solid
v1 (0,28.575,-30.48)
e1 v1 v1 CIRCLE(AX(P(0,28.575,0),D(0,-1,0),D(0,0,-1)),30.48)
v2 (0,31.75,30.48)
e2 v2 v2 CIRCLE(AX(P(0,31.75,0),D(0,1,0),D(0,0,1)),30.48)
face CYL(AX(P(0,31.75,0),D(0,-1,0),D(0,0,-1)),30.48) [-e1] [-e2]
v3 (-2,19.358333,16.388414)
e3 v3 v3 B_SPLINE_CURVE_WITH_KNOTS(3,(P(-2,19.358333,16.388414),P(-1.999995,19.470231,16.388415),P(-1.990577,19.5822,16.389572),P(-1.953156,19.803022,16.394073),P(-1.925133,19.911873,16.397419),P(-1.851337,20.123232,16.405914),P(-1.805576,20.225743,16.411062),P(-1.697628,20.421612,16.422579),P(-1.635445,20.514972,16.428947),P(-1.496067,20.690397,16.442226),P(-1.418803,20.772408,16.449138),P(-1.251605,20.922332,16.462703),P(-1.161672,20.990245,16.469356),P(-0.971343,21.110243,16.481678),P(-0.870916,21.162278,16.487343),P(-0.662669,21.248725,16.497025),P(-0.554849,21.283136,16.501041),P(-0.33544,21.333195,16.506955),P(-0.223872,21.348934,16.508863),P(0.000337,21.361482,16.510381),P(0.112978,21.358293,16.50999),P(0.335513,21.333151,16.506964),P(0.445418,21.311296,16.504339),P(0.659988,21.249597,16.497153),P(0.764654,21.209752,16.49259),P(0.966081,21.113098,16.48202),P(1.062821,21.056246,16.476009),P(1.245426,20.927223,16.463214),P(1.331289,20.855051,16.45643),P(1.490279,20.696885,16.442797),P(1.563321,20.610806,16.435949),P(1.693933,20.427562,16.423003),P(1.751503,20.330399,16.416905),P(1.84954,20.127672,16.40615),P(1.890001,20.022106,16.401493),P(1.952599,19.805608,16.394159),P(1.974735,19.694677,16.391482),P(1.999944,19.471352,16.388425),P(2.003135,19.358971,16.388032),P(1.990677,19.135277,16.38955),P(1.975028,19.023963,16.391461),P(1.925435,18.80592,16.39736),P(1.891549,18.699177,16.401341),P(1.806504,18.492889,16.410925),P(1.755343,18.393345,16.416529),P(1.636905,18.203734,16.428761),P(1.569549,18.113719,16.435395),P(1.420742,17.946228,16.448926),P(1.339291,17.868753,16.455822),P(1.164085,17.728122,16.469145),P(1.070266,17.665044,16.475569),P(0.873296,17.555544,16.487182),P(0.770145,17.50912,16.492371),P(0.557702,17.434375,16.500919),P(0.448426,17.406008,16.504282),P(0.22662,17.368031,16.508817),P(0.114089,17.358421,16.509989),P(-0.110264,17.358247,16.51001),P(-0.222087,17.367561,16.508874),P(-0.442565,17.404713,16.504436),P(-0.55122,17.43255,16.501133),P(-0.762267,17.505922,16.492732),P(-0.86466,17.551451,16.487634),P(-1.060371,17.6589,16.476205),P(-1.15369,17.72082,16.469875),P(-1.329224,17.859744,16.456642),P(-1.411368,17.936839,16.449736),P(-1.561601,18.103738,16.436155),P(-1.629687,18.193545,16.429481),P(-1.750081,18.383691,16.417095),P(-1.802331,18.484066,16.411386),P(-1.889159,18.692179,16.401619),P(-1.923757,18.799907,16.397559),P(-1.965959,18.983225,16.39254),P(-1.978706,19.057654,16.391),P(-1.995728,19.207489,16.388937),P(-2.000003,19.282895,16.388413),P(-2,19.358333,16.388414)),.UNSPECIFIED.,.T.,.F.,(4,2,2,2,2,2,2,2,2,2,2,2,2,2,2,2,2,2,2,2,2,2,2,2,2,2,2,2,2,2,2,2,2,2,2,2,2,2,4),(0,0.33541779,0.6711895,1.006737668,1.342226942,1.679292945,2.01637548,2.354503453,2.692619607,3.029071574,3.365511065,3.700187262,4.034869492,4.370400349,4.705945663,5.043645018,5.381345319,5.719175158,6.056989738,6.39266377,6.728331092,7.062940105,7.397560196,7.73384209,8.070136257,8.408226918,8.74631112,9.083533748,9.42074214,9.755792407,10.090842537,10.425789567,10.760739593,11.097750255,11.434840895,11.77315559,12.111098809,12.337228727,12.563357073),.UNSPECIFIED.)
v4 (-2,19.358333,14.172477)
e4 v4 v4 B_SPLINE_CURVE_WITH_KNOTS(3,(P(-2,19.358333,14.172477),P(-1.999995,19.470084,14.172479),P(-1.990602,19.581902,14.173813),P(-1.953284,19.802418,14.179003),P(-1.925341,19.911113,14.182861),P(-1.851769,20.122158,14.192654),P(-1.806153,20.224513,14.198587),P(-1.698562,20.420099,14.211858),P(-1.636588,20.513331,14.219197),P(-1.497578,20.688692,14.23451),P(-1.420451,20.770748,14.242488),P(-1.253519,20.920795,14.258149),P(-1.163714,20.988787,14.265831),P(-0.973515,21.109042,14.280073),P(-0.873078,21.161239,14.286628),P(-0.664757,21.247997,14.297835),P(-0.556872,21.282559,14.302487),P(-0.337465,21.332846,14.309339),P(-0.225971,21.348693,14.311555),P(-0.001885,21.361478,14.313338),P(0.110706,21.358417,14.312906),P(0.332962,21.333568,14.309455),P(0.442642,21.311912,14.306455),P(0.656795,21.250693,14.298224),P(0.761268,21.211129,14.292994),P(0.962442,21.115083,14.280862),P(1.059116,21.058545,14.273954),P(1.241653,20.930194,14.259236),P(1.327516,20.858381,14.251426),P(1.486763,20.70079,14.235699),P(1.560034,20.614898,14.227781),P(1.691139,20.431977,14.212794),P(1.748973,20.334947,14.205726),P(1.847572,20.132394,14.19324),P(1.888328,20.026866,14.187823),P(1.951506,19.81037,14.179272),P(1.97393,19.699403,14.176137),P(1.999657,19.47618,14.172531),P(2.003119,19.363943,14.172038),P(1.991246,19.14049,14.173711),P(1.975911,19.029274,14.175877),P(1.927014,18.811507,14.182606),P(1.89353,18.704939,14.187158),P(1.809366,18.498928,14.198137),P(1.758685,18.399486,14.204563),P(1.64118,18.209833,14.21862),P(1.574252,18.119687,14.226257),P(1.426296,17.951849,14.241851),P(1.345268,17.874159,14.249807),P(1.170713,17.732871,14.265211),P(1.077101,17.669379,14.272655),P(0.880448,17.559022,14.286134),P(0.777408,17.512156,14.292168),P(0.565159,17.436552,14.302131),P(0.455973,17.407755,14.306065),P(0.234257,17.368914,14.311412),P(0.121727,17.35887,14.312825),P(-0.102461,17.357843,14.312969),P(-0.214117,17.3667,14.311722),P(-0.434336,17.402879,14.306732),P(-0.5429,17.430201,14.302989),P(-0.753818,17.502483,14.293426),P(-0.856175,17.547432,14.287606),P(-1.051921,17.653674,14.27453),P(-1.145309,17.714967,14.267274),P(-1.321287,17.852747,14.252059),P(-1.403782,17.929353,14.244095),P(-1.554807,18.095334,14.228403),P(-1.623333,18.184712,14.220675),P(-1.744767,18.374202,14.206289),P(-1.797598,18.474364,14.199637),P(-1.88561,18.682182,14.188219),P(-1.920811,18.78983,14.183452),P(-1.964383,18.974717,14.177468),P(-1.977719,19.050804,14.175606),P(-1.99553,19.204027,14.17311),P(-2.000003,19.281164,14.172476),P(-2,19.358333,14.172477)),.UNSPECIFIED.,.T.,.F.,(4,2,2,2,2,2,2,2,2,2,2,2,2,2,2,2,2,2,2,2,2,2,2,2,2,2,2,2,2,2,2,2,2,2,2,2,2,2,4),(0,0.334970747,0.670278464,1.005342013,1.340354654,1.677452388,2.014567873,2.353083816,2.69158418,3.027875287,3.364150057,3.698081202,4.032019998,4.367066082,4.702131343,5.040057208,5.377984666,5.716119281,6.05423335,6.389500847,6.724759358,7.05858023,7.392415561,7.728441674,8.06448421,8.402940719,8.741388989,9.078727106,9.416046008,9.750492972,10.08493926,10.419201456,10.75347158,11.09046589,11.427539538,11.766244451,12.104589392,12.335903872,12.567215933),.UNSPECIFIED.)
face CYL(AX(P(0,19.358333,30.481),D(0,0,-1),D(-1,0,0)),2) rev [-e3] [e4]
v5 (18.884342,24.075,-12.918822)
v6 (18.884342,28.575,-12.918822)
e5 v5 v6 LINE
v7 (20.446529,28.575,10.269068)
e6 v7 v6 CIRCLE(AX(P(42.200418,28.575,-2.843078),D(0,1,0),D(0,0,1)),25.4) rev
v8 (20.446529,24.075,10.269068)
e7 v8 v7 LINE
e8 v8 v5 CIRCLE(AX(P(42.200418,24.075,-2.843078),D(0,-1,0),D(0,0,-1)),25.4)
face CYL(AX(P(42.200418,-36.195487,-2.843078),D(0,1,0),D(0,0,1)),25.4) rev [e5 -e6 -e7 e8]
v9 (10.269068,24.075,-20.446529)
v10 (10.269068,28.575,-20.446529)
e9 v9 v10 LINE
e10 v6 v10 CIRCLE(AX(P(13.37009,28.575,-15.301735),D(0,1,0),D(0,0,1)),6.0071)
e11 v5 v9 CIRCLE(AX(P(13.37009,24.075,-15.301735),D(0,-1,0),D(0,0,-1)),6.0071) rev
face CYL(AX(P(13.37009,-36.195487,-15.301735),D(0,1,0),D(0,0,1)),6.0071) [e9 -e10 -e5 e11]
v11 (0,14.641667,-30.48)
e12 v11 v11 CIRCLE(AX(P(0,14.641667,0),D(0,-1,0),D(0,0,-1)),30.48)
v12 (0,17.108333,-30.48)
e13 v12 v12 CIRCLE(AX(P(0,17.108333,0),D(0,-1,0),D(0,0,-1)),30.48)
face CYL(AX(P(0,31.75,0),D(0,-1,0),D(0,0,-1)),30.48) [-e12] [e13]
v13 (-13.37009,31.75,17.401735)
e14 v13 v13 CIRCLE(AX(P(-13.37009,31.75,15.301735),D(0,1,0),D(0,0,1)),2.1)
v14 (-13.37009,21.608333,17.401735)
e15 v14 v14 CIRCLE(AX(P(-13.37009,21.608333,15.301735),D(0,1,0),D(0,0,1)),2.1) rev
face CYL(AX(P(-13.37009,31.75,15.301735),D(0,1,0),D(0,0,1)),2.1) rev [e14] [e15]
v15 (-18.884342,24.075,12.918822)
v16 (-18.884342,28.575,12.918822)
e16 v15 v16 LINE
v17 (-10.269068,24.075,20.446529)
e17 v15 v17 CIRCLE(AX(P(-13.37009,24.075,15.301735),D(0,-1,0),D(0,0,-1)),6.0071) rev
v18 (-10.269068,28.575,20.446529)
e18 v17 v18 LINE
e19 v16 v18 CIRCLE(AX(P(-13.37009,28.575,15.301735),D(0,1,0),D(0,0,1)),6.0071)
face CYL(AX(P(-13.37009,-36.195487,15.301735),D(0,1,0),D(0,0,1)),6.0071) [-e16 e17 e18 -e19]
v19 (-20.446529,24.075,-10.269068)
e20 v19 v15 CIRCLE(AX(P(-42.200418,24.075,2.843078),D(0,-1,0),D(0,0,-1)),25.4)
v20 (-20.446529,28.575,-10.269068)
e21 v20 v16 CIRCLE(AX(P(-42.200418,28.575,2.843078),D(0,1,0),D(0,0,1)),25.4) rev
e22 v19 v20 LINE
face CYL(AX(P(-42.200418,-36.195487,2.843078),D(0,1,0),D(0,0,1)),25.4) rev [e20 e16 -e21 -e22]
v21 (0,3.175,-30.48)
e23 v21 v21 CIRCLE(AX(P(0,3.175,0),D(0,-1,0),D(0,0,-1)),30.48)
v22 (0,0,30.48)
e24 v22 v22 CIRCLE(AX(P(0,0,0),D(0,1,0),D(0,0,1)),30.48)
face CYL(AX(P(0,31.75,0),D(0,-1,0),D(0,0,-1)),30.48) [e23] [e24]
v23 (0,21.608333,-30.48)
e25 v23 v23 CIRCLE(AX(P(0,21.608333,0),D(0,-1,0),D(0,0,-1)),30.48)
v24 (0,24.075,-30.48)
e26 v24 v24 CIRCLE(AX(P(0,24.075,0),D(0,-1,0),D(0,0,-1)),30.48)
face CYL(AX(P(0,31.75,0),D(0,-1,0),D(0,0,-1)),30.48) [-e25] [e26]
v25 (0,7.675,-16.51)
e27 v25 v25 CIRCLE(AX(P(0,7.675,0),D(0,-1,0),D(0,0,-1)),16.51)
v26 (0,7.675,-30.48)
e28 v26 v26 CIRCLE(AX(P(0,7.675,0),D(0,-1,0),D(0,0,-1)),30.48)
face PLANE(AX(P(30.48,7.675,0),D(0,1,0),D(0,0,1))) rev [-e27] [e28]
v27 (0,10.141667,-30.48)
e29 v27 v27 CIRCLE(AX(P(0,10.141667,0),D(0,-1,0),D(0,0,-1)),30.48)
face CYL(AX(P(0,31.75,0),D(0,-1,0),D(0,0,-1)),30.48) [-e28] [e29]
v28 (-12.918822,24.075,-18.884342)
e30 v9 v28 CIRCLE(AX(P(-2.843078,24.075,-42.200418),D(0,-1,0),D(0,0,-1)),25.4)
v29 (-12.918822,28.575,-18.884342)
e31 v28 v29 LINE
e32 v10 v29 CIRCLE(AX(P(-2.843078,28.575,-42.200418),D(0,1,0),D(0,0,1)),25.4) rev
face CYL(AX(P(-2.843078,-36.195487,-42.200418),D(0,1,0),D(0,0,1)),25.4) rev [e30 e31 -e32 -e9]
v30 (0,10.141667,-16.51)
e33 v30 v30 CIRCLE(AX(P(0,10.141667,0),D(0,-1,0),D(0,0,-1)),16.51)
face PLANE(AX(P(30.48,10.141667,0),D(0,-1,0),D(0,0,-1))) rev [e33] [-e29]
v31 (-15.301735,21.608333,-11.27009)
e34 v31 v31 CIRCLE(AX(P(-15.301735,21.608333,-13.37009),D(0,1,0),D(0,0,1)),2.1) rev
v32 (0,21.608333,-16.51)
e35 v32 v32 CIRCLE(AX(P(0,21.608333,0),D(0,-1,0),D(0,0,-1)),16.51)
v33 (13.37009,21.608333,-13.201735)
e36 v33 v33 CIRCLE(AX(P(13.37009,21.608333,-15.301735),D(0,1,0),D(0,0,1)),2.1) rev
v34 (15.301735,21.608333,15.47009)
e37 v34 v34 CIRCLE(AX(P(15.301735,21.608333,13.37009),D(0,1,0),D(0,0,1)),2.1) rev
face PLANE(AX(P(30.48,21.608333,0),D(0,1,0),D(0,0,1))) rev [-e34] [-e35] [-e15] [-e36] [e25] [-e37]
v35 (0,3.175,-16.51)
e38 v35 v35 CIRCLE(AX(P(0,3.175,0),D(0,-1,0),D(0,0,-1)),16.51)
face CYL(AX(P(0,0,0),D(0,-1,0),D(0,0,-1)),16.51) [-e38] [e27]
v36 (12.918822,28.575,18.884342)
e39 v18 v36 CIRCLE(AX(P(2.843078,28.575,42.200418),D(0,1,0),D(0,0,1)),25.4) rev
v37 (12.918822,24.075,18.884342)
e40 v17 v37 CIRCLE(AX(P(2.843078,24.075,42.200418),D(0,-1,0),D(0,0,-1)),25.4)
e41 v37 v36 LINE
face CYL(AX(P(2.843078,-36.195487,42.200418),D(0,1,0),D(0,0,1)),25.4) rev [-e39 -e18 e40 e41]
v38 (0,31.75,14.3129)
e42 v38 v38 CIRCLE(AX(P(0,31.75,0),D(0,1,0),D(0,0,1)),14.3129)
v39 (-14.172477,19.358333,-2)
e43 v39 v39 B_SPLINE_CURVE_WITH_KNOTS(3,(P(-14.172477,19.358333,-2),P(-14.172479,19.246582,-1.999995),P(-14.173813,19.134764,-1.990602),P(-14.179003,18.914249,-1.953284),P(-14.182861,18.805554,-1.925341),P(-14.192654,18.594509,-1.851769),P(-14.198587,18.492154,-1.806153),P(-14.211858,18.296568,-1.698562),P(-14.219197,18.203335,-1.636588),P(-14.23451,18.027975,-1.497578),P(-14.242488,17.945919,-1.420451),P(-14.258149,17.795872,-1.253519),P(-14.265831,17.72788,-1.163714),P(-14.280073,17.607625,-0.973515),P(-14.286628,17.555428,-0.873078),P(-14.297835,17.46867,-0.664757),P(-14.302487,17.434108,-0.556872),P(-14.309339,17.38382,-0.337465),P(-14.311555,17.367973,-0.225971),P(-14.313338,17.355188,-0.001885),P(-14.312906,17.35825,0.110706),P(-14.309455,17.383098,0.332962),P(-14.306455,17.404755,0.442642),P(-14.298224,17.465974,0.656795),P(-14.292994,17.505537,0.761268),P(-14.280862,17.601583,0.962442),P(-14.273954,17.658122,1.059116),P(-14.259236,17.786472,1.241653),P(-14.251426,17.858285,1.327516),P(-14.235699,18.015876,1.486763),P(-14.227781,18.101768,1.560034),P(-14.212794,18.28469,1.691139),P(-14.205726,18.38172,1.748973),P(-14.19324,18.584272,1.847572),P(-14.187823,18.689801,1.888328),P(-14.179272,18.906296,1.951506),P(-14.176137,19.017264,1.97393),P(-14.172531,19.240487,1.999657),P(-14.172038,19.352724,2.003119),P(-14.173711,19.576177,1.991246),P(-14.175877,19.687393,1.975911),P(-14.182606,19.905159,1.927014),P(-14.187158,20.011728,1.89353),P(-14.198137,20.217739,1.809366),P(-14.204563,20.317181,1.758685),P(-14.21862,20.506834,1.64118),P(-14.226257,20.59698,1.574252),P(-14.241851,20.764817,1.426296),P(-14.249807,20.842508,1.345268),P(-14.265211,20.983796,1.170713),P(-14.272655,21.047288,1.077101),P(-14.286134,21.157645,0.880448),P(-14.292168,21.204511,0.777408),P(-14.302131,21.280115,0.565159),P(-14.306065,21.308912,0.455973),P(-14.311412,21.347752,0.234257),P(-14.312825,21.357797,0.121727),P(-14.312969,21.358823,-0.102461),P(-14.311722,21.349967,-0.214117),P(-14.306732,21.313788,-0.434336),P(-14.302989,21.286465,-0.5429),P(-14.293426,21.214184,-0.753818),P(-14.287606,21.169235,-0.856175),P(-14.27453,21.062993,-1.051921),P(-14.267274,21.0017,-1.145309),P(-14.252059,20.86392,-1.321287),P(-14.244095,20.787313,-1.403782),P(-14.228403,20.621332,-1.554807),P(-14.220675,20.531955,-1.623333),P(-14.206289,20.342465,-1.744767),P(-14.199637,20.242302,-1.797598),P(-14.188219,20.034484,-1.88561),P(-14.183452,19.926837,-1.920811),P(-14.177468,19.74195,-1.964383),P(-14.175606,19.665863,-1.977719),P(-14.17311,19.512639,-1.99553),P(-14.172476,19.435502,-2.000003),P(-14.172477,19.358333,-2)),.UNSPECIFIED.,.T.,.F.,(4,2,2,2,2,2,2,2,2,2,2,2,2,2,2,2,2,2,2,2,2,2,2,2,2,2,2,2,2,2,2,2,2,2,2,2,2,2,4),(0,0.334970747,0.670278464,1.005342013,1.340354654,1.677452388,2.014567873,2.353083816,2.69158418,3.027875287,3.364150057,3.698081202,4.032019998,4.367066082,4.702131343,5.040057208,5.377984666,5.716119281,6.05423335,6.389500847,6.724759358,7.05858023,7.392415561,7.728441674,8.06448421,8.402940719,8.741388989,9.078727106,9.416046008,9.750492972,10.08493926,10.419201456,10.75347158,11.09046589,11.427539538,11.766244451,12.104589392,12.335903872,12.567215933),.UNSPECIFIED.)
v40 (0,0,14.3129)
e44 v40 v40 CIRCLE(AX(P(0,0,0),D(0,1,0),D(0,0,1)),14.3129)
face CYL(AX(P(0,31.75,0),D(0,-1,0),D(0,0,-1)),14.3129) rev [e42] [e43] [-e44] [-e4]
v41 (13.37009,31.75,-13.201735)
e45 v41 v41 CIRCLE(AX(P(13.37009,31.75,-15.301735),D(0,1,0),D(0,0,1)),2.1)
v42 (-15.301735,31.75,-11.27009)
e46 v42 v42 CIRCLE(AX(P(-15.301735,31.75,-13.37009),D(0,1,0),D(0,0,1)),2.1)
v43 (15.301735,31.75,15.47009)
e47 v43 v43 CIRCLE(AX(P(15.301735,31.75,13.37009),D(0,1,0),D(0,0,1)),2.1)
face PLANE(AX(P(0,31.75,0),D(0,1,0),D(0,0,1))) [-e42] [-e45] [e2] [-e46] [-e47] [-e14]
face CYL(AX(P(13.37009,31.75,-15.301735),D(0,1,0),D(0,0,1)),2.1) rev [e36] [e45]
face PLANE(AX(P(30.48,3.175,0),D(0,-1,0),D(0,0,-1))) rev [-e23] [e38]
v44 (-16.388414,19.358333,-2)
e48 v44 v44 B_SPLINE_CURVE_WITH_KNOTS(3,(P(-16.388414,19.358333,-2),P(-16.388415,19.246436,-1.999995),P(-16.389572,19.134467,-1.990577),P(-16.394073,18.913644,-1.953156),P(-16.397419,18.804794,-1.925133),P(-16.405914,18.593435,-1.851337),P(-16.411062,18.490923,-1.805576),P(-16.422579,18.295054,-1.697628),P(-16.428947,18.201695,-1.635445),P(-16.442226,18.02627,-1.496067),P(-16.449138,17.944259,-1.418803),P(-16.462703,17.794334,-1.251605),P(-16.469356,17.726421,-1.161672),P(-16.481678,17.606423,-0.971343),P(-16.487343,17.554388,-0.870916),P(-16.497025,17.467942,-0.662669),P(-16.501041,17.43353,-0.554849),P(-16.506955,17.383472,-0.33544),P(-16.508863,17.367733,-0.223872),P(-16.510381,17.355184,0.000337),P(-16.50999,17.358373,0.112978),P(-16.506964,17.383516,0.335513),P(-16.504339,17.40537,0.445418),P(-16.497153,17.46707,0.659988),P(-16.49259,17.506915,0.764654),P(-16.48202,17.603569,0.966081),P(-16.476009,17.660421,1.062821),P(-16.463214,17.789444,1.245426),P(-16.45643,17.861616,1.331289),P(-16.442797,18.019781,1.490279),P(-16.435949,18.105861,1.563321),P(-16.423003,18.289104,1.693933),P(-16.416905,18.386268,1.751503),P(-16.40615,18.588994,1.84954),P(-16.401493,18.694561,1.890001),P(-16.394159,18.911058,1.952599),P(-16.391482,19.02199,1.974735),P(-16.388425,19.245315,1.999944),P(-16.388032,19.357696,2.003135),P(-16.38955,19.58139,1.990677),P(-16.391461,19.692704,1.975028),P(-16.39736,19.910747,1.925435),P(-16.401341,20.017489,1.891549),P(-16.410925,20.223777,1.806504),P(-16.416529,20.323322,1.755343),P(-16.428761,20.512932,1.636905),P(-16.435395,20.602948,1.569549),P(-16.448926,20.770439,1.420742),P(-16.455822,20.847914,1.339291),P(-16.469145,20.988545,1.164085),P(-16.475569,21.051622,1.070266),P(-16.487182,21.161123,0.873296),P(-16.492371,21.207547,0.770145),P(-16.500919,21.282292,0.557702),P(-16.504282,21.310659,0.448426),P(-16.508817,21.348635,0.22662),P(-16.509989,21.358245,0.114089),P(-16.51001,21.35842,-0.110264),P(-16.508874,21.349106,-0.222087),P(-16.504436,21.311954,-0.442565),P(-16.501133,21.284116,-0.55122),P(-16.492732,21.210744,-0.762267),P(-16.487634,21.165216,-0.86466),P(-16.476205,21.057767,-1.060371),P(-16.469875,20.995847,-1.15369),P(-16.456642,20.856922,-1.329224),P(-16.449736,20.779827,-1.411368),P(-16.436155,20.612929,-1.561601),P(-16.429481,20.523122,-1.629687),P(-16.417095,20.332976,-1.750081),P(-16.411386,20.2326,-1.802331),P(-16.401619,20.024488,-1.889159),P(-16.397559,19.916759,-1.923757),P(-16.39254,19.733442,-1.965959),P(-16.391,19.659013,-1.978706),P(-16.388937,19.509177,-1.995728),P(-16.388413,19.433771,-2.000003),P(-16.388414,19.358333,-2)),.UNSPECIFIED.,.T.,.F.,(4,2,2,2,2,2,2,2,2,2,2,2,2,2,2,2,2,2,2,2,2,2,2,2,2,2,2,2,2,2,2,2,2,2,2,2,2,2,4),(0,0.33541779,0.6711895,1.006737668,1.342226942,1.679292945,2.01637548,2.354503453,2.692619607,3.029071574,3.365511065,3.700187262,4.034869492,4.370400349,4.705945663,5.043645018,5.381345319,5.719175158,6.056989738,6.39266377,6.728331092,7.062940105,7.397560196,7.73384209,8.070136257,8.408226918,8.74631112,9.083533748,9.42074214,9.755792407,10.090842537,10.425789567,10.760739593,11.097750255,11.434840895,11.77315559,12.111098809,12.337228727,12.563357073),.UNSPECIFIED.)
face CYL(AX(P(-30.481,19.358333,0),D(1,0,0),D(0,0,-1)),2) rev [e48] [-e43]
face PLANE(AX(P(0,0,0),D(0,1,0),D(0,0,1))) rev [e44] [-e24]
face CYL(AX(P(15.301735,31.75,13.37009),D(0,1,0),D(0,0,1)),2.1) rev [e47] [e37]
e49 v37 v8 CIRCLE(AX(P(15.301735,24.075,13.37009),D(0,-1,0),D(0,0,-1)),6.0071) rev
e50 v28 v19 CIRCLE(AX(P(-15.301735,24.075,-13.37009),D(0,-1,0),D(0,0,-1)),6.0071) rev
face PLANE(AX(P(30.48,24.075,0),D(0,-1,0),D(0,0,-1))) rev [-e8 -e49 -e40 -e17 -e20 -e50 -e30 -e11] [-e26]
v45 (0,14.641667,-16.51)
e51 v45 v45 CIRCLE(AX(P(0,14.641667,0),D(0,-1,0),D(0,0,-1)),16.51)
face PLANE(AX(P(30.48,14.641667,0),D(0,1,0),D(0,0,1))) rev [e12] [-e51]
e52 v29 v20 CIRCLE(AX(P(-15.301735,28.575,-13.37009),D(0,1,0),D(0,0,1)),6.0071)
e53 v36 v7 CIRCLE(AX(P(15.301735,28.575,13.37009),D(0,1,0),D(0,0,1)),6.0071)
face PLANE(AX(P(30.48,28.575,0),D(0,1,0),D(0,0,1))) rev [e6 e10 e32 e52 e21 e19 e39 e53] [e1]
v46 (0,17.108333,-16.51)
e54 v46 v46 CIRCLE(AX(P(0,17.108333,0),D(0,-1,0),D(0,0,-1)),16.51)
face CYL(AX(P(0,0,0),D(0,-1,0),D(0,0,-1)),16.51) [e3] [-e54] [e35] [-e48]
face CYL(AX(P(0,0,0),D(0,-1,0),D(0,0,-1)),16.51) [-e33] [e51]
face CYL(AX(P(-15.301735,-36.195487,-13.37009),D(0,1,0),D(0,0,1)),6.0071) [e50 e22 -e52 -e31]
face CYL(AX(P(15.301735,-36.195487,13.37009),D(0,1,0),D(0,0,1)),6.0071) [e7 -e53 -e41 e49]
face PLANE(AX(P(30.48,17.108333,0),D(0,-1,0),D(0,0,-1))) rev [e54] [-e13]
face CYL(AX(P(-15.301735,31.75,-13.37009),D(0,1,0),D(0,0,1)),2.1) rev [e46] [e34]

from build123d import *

# Parameters (mm, degrees)
SKETCH1_R                        = 30.48
SKETCH1_R_2                      = 14.3129
BOSS_EXTRUDE1_DEPTH              = 31.75
SKETCH2_W                        = 13.97
SKETCH2_H                        = 4.5
BOSS_EXTRUDE2_START              = -7.675
BOSS_EXTRUDE2_OUTLINE_R          = 16.51
BOSS_EXTRUDE2_DEPTH              = 4.5
CUT_EXTRUDE2_REACH               = 55.536
CUT_EXTRUDE2_END_RADIUS          = 16.51
SKETCH8_R                        = 2
CUT_EXTRUDE3_REACH               = 55.536
CUT_EXTRUDE3_END_RADIUS          = 16.51
SKETCH9_R                        = 2
SKETCH10_R                       = 1
CUT_EXTRUDE4_DEPTH               = 10.141666667
TAP_DRILL_FOR_M5X0_8_TAP1_REACH  = 72.9
TAP_DRILL_FOR_M5X0_8_TAP1_BORE_R = 2.1


with BuildPart() as part:
    # Sketch1 → Boss-Extrude1 (new body)
    with BuildSketch(Plane(origin=(0, 0, 0), x_dir=(1, 0, 0), z_dir=(0, 1, 0))):
        with Locations(Location((0, 0, 0), (0, 0, 270))):
            Circle(SKETCH1_R)
        with Locations(Location((0, 0, 0), (0, 0, 270))):
            Circle(SKETCH1_R_2, mode=Mode.SUBTRACT)
    extrude(amount=BOSS_EXTRUDE1_DEPTH)

    # Sketch2 → Cut-Revolve2 (revolve, cut)
    with BuildSketch(Plane.XY, mode=Mode.PRIVATE) as cut_revolve2_sk:
        with Locations((23.495, 26.325)):
            Rectangle(SKETCH2_W, SKETCH2_H)
        with Locations((23.495, 12.391666667)):
            Rectangle(SKETCH2_W, SKETCH2_H)
        with Locations((23.495, 5.425)):
            Rectangle(SKETCH2_W, SKETCH2_H)
        with Locations((23.495, 19.358333333)):
            Rectangle(SKETCH2_W, SKETCH2_H)
    revolve(cut_revolve2_sk.sketch.rotate(Axis((0, 0, 0), (0, 1, 0)), 90), axis=Axis((0, 0, 0), (0, 1, 0)), mode=Mode.SUBTRACT)

    # Boss-Extrude2: read off the stored shape, not the designer's step
    # Boss-Extrude2 outline → Boss-Extrude2 (add)
    with BuildSketch(Plane(origin=(0, 31.75, 0), x_dir=(1, 0, 0), z_dir=(0, 1, 0)).offset(BOSS_EXTRUDE2_START)):
        with BuildLine():
            ThreePointArc((-20.446529483, 10.269067687), (-16.857865235, -1.135728529), (-18.884341927, -12.918821503))
            ThreePointArc((-18.884341927, -12.918821503), (-17.322622903, -19.825310342), (-10.269067687, -20.446529483))
            ThreePointArc((-10.269067687, -20.446529483), (1.135728529, -16.857865235), (12.918821503, -18.884341927))
            ThreePointArc((12.918821503, -18.884341927), (19.825310342, -17.322622903), (20.446529483, -10.269067687))
            ThreePointArc((20.446529483, -10.269067687), (16.857865235, 1.135728529), (18.884341927, 12.918821503))
            ThreePointArc((18.884341927, 12.918821503), (17.322622903, 19.825310342), (10.269067687, 20.446529483))
            ThreePointArc((10.269067687, 20.446529483), (-1.135728529, 16.857865235), (-12.918821503, 18.884341927))
            ThreePointArc((-12.918821503, 18.884341927), (-19.825310342, 17.322622903), (-20.446529483, 10.269067687))
        make_face()
        Circle(BOSS_EXTRUDE2_OUTLINE_R, mode=Mode.SUBTRACT)
    extrude(amount=BOSS_EXTRUDE2_DEPTH)

    # Cut-Extrude2: up to this cylinder (the profile starts inside it)
    cut_extrude2_end = Plane(origin=(0, 19.358333, 0), z_dir=(0, -1, 0)) * Cylinder(CUT_EXTRUDE2_END_RADIUS, 145.092, mode=Mode.PRIVATE)
    # Sketch8 → Cut-Extrude2 (cut, up to the surface)
    with BuildSketch(Plane.XY, mode=Mode.PRIVATE) as cut_extrude2_sk1:
        with Locations(Location((0, 19.358333333, 0), (0, 0, 180))):
            Circle(SKETCH8_R)
    cut_extrude2_tool1 = extrude(cut_extrude2_sk1.sketch, amount=CUT_EXTRUDE2_REACH, mode=Mode.PRIVATE) & cut_extrude2_end
    add(cut_extrude2_tool1.solids().sort_by_distance((0, 19.358333, 0))[0], mode=Mode.SUBTRACT)

    # Cut-Extrude3: up to this cylinder (the profile starts inside it)
    cut_extrude3_end = Plane(origin=(0, 19.358333, 0), z_dir=(0, -1, 0)) * Cylinder(CUT_EXTRUDE3_END_RADIUS, 145.092, mode=Mode.PRIVATE)
    # Sketch9 → Cut-Extrude3 (cut, up to the surface)
    with BuildSketch(Plane(origin=(0, 0, 0), x_dir=(0, 0, -1), z_dir=(1, 0, 0)), mode=Mode.PRIVATE) as cut_extrude3_sk1:
        with Locations((0, 19.358333333)):
            Circle(SKETCH9_R)
    cut_extrude3_tool1 = extrude(cut_extrude3_sk1.sketch, amount=-CUT_EXTRUDE3_REACH, mode=Mode.PRIVATE) & cut_extrude3_end
    add(cut_extrude3_tool1.solids().sort_by_distance((0, 19.358333, 0))[0], mode=Mode.SUBTRACT)

    # Sketch10 → Cut-Extrude4 (cut)
    with BuildSketch(Plane(origin=(0, 31.75, 0), x_dir=(1, 0, 0), z_dir=(0, 1, 0))):
        with Locations(Location((15.301734948, -13.370090036, 0), (0, 0, 270))):
            Circle(SKETCH10_R)
        with Locations(Location((13.370090036, 15.301734948, 0), (0, 0, 270))):
            Circle(SKETCH10_R)
        with Locations(Location((-15.301734948, 13.370090036, 0), (0, 0, 270))):
            Circle(SKETCH10_R)
        with Locations(Location((-13.370090036, -15.301734948, 0), (0, 0, 270))):
            Circle(SKETCH10_R)
    extrude(amount=-CUT_EXTRUDE4_DEPTH, mode=Mode.SUBTRACT)

    # Tap Drill for M5x0.8 Tap1 bore (on position points) → Tap Drill for M5x0.8 Tap1 (cut, up to next)
    with BuildSketch(Plane(origin=(15.301734948, 31.75, 13.370090036), x_dir=(0, 0, 1), z_dir=(0, 1, 0)), mode=Mode.PRIVATE) as tap_drill_for_m5x0_8_tap1_sk1:
        Circle(TAP_DRILL_FOR_M5X0_8_TAP1_BORE_R)
    tap_drill_for_m5x0_8_tap1_tool1 = extrude(tap_drill_for_m5x0_8_tap1_sk1.sketch, amount=-TAP_DRILL_FOR_M5X0_8_TAP1_REACH, mode=Mode.PRIVATE) & part.part
    # Tap Drill for M5x0.8 Tap1 bore (on position points) → Tap Drill for M5x0.8 Tap1 (cut, up to next)
    with BuildSketch(Plane(origin=(15.301734948, 31.75, 13.370090036), x_dir=(0, 0, 1), z_dir=(0, 1, 0)), mode=Mode.PRIVATE) as tap_drill_for_m5x0_8_tap1_sk2:
        with Locations((1.931644912, -28.671824984)):
            Circle(TAP_DRILL_FOR_M5X0_8_TAP1_BORE_R)
    tap_drill_for_m5x0_8_tap1_tool2 = extrude(tap_drill_for_m5x0_8_tap1_sk2.sketch, amount=-TAP_DRILL_FOR_M5X0_8_TAP1_REACH, mode=Mode.PRIVATE) & part.part
    # Tap Drill for M5x0.8 Tap1 bore (on position points) → Tap Drill for M5x0.8 Tap1 (cut, up to next)
    with BuildSketch(Plane(origin=(15.301734948, 31.75, 13.370090036), x_dir=(0, 0, 1), z_dir=(0, 1, 0)), mode=Mode.PRIVATE) as tap_drill_for_m5x0_8_tap1_sk3:
        with Locations((-26.740180072, -30.603469896)):
            Circle(TAP_DRILL_FOR_M5X0_8_TAP1_BORE_R)
    tap_drill_for_m5x0_8_tap1_tool3 = extrude(tap_drill_for_m5x0_8_tap1_sk3.sketch, amount=-TAP_DRILL_FOR_M5X0_8_TAP1_REACH, mode=Mode.PRIVATE) & part.part
    # Tap Drill for M5x0.8 Tap1 bore (on position points) → Tap Drill for M5x0.8 Tap1 (cut, up to next)
    with BuildSketch(Plane(origin=(15.301734948, 31.75, 13.370090036), x_dir=(0, 0, 1), z_dir=(0, 1, 0)), mode=Mode.PRIVATE) as tap_drill_for_m5x0_8_tap1_sk4:
        with Locations((-28.671824984, -1.931644912)):
            Circle(TAP_DRILL_FOR_M5X0_8_TAP1_BORE_R)
    tap_drill_for_m5x0_8_tap1_tool4 = extrude(tap_drill_for_m5x0_8_tap1_sk4.sketch, amount=-TAP_DRILL_FOR_M5X0_8_TAP1_REACH, mode=Mode.PRIVATE) & part.part
    add(tap_drill_for_m5x0_8_tap1_tool1.solids().sort_by_distance((15.301735, 31.75, 13.37009))[0], mode=Mode.SUBTRACT)
    add(tap_drill_for_m5x0_8_tap1_tool2.solids().sort_by_distance((-13.37009, 31.75, 15.301735))[0], mode=Mode.SUBTRACT)
    add(tap_drill_for_m5x0_8_tap1_tool3.solids().sort_by_distance((-15.301735, 31.75, -13.37009))[0], mode=Mode.SUBTRACT)
    add(tap_drill_for_m5x0_8_tap1_tool4.solids().sort_by_distance((13.37009, 31.75, -15.301735))[0], mode=Mode.SUBTRACT)


solid = part.part
